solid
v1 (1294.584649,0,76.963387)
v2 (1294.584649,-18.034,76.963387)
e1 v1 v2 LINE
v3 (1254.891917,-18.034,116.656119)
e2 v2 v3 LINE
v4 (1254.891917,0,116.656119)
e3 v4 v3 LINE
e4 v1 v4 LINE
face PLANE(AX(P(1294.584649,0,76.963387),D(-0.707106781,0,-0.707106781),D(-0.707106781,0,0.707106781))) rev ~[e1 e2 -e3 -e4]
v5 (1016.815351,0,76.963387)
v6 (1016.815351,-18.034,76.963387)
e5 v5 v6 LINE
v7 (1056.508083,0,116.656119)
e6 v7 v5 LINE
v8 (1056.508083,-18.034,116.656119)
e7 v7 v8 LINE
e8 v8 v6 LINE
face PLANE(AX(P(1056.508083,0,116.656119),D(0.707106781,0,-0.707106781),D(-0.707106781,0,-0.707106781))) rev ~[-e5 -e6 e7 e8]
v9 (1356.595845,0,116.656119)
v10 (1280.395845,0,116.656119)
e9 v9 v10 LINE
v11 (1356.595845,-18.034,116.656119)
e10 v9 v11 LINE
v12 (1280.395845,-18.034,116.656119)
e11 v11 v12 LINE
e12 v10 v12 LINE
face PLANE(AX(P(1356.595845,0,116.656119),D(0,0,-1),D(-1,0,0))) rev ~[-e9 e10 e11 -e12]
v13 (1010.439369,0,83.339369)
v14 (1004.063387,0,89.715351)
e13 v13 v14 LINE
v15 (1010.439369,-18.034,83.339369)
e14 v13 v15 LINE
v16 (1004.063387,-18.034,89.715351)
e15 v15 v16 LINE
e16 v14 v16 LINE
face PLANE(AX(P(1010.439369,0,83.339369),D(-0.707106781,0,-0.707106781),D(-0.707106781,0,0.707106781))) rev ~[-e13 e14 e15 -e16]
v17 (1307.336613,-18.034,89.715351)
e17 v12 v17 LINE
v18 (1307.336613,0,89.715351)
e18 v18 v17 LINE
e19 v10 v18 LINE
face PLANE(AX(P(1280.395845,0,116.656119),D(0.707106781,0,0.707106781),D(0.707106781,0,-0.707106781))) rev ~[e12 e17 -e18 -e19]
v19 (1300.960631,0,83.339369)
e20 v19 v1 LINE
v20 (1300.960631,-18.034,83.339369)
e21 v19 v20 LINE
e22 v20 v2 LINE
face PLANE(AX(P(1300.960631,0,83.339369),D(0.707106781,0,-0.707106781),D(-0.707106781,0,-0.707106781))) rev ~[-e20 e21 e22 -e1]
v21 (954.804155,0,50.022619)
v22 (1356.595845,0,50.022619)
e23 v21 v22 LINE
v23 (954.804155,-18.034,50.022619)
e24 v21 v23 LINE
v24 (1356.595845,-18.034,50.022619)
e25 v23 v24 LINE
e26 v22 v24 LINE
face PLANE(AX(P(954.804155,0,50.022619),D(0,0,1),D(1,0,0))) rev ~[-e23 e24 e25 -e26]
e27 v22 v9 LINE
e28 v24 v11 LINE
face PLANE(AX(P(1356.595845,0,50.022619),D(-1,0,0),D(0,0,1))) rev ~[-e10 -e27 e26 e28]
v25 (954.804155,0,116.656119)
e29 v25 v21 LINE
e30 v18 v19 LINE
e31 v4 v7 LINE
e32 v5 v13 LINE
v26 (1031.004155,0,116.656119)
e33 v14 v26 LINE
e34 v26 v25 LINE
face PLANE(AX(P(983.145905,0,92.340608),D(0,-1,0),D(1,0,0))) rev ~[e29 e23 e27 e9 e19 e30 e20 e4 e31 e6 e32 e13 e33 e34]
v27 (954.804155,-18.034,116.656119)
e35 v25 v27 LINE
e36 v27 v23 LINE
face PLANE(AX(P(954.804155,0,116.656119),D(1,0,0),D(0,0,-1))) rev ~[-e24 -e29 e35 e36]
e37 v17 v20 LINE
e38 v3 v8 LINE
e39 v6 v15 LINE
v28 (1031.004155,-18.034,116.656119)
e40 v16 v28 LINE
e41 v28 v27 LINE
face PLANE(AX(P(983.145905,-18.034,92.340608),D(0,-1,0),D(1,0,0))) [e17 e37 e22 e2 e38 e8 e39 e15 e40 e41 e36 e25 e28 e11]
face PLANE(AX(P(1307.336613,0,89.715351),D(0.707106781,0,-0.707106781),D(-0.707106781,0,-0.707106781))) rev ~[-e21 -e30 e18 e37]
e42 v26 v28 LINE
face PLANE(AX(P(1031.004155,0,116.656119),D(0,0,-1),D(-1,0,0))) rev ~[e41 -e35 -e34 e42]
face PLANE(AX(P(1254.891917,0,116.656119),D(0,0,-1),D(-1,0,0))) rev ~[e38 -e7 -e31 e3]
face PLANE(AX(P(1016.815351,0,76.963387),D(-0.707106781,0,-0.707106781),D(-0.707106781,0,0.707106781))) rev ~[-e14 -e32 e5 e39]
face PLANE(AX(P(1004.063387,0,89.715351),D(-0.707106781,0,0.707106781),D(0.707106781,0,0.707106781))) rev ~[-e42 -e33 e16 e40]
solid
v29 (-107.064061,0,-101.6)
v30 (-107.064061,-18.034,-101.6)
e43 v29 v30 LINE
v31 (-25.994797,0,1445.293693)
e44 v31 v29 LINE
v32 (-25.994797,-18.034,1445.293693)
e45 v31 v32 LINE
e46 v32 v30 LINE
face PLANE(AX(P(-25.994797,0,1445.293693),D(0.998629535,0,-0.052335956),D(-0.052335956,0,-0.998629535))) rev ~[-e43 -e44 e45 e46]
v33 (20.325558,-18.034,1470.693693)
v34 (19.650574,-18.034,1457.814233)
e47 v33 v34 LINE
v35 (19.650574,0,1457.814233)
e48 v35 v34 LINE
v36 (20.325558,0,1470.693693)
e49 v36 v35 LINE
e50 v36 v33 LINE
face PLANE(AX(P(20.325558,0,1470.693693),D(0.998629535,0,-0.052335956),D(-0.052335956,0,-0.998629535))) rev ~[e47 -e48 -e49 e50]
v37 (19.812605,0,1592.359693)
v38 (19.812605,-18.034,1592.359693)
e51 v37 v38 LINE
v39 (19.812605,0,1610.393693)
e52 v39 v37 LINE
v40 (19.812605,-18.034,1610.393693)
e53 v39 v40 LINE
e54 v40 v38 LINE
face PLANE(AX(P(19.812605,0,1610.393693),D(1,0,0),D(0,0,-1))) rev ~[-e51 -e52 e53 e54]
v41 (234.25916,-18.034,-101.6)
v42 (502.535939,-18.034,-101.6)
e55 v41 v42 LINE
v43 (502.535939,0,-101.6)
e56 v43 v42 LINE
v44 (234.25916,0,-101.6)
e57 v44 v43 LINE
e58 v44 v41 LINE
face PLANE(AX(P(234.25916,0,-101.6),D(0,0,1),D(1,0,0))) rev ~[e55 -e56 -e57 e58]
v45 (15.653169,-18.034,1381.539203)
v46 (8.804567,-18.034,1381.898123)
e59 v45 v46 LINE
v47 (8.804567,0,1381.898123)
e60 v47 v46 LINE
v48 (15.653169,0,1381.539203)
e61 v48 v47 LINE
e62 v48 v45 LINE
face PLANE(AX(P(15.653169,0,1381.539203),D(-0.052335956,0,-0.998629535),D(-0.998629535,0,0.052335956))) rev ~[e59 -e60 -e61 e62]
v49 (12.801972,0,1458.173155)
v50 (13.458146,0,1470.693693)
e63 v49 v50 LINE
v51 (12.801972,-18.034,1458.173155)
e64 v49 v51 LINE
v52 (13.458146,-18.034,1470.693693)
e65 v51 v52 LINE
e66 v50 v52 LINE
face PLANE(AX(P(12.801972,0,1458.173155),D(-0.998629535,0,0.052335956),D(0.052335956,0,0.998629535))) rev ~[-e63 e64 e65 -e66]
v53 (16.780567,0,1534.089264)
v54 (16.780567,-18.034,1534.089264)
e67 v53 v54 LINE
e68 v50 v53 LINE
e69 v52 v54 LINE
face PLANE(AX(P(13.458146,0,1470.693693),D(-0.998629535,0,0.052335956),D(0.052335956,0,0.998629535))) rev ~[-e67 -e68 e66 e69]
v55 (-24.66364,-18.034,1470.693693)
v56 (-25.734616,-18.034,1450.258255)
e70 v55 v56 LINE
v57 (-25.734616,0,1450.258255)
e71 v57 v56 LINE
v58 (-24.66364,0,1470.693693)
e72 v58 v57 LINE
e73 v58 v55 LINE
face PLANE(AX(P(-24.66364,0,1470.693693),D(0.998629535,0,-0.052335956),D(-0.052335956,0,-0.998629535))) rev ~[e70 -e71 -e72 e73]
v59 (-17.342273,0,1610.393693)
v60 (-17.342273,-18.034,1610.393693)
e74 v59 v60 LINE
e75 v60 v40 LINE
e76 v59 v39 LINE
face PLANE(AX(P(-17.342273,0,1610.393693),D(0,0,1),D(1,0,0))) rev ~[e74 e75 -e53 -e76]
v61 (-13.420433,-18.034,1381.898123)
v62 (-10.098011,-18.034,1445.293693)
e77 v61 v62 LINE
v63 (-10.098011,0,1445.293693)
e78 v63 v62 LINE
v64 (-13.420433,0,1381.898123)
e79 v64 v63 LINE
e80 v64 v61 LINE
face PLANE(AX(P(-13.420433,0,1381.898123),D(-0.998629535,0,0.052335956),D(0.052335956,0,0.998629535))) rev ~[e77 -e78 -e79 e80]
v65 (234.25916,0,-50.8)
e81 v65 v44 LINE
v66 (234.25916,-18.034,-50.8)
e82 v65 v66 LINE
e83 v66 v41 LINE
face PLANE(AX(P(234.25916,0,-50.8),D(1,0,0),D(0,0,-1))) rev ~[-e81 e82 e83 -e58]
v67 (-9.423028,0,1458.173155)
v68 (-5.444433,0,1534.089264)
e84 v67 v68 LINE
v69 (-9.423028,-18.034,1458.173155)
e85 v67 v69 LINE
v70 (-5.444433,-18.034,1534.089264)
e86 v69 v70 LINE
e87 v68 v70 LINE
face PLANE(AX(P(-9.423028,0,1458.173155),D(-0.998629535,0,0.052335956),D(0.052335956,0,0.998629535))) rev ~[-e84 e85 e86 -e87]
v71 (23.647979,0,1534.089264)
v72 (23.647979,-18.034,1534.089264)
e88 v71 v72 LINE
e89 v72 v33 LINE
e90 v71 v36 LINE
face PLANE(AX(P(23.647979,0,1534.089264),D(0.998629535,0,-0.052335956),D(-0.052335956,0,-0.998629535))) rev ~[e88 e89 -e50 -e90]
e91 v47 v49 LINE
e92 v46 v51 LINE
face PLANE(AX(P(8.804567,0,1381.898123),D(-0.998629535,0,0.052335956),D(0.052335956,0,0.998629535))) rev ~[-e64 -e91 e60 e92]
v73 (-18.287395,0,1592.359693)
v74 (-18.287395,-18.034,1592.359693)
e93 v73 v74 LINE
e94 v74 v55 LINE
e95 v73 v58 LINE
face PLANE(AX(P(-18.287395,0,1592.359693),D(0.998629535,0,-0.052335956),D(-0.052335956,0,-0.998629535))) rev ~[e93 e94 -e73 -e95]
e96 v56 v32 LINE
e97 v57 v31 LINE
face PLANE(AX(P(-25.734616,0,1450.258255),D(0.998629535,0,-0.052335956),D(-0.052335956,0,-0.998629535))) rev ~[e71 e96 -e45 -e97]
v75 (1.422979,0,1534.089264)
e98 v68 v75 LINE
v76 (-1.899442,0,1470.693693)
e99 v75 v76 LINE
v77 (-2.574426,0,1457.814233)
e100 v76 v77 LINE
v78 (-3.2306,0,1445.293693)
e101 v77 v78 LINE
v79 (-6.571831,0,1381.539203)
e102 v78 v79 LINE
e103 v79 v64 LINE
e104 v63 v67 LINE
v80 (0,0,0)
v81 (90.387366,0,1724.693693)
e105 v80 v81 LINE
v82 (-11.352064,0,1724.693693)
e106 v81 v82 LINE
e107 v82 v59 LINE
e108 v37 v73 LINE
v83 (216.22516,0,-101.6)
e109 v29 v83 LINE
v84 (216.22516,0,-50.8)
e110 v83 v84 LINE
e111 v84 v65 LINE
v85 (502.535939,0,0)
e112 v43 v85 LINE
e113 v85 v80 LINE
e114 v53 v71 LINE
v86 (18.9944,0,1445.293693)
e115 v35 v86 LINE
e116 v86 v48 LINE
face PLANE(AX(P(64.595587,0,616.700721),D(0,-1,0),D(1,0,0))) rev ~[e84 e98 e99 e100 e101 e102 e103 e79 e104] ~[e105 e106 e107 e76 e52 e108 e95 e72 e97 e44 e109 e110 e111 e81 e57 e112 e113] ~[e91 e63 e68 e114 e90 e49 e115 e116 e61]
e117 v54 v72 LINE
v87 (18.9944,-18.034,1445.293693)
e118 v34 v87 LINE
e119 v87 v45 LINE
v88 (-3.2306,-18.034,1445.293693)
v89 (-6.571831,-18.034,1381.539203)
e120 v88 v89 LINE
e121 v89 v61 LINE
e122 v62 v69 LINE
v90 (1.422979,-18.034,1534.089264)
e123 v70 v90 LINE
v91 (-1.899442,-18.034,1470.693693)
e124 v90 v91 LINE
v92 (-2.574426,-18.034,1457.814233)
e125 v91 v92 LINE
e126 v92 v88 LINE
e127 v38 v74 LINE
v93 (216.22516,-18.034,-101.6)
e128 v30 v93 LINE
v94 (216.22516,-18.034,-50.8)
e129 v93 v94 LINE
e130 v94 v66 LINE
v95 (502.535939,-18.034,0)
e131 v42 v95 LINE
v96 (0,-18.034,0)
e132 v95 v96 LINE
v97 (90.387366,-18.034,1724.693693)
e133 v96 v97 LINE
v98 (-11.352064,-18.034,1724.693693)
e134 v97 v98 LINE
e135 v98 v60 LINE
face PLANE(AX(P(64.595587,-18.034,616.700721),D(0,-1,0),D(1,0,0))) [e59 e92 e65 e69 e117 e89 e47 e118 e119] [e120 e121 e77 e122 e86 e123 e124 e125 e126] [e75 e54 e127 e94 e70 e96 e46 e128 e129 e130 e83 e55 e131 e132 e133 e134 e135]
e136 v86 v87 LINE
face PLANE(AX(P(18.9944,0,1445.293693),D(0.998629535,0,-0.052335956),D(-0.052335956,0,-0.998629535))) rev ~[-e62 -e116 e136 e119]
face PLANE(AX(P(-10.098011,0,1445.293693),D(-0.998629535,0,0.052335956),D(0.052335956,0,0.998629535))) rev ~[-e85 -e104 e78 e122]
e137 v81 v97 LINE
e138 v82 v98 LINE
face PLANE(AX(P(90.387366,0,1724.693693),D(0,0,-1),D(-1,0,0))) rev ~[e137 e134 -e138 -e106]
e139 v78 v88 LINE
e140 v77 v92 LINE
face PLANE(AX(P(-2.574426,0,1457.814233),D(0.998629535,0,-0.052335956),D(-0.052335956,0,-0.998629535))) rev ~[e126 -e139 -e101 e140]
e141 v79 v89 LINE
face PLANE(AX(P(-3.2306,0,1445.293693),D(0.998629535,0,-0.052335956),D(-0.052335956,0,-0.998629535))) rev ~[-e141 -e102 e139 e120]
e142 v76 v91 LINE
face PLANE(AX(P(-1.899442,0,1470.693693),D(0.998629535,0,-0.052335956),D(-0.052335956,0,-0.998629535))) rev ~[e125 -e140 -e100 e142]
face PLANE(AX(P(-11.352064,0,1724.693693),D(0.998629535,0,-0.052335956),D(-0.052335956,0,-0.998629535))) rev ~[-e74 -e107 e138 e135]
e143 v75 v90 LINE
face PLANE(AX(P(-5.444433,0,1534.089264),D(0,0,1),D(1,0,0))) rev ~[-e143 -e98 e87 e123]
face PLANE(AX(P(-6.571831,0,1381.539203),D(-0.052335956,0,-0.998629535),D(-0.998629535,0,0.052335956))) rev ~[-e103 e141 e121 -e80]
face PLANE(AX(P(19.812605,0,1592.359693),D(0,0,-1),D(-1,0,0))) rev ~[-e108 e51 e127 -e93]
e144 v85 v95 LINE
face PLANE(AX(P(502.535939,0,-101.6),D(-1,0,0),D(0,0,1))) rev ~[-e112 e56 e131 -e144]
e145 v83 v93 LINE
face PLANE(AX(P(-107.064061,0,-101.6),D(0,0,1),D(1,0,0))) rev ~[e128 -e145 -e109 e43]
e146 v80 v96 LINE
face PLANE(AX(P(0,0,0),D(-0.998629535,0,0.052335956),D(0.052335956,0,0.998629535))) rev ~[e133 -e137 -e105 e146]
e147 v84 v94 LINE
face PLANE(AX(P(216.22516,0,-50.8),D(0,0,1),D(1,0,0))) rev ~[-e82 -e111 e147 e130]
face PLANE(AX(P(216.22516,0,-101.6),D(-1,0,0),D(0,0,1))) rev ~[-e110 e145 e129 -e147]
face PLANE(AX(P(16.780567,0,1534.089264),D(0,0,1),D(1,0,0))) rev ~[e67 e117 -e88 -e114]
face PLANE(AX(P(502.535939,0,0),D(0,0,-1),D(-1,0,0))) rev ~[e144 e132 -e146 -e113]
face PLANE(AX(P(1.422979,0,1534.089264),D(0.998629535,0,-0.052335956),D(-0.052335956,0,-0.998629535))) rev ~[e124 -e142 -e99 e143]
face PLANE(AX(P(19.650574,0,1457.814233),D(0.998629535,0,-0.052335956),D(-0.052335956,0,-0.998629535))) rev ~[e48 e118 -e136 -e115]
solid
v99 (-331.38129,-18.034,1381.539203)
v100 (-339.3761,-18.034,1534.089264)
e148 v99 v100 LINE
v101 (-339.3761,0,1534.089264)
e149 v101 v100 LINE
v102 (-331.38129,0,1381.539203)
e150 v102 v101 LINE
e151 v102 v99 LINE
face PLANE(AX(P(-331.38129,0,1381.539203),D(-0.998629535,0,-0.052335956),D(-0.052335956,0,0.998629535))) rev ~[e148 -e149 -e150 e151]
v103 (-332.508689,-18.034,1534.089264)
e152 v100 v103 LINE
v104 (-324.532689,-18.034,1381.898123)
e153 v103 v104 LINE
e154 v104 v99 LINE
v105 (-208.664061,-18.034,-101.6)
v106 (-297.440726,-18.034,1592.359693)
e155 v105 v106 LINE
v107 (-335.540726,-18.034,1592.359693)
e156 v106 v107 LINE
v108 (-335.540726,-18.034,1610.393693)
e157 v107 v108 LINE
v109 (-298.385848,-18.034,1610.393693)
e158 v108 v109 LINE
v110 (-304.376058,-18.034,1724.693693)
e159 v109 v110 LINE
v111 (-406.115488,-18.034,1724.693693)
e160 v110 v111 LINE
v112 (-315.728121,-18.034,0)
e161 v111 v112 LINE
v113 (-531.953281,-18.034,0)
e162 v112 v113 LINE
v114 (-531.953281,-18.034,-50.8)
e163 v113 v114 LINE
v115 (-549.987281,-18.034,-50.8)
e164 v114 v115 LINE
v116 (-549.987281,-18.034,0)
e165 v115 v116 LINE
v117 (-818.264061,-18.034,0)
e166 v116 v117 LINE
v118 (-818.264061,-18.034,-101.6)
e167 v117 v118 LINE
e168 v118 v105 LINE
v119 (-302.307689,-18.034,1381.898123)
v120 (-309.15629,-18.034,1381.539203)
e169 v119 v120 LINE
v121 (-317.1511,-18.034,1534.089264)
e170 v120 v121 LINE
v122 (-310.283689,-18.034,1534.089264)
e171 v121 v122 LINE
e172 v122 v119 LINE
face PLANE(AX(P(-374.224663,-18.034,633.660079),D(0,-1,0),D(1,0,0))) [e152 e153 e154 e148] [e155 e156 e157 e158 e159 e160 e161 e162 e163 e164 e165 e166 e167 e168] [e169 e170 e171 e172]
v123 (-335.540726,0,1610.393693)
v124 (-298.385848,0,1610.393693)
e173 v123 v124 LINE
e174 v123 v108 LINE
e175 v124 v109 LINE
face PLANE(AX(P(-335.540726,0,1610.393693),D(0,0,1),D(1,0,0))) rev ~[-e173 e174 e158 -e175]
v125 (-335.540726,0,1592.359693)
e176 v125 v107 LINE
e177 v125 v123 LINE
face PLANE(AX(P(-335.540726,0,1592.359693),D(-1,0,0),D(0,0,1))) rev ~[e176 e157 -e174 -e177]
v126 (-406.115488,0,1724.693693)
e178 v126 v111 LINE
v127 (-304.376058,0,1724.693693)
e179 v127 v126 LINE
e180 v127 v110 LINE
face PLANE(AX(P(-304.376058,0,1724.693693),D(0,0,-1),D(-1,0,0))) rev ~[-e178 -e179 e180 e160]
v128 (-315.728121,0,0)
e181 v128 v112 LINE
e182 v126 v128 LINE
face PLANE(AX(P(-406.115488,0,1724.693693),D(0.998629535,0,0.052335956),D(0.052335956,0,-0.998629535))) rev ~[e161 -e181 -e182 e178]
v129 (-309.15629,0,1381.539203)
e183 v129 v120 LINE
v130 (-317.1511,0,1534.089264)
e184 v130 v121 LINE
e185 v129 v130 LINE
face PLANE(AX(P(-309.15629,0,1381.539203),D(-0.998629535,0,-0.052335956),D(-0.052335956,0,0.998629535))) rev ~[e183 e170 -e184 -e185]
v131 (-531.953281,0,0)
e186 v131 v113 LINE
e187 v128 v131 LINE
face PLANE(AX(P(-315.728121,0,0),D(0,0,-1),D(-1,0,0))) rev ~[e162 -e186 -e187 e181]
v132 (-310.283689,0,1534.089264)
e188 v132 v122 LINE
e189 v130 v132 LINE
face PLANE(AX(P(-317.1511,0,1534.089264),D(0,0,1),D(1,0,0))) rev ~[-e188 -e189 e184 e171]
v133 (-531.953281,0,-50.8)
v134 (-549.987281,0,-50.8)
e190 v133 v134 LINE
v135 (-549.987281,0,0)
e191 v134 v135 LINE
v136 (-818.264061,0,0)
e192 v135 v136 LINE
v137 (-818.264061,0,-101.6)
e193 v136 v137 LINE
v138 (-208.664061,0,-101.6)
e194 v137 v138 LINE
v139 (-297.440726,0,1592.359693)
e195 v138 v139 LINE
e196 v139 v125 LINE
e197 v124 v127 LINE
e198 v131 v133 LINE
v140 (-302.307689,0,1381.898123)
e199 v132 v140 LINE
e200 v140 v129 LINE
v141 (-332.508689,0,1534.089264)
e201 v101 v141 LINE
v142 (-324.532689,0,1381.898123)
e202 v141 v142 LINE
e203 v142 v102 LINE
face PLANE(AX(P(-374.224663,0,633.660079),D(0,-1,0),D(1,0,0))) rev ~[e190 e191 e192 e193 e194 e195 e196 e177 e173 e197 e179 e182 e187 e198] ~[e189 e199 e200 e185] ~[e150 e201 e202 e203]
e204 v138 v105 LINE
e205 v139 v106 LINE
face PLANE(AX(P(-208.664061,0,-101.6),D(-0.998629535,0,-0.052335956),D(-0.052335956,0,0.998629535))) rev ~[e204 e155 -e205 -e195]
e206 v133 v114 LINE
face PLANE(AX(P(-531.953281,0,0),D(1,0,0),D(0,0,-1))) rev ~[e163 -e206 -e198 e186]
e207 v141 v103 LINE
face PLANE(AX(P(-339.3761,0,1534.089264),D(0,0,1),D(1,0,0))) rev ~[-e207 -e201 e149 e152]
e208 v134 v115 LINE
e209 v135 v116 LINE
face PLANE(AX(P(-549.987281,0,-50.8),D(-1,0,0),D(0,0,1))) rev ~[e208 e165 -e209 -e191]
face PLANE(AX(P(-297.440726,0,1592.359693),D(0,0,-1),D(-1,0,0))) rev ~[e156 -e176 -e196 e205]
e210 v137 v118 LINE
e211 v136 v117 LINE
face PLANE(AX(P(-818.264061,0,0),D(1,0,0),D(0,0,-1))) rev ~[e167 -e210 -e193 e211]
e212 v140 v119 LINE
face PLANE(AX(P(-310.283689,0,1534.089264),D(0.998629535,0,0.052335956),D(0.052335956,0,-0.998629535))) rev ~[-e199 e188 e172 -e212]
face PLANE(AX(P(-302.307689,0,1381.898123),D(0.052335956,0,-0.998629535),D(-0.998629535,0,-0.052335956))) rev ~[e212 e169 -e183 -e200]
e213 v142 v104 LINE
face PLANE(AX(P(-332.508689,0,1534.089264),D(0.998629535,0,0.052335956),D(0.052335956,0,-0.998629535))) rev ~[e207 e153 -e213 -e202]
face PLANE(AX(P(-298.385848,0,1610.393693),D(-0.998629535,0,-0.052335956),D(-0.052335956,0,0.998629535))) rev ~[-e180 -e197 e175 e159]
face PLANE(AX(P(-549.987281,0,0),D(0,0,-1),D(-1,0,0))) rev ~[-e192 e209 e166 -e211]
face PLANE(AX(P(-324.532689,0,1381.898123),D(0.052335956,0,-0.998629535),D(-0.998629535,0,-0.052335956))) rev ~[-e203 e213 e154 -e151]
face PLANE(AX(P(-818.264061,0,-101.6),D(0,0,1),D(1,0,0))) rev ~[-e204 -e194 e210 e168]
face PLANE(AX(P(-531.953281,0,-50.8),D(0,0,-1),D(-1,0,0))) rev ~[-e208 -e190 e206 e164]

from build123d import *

# Parameters (mm, degrees)
F1_DEPTH = 18.034


# Not quite as in the source:
# - a feature names something its author has since deleted; it is built from what else it names


with BuildPart() as f1:
    # F0 (on Front) → F1 (new body)
    with BuildSketch(Plane.XZ):
        Polygon((502.5359392715, 0), (0, 0), (90.3873664019, 1724.6936931592), (39.5176512252, 1724.6936931592), (39.5176512252, 1267.4936931592), (-19.4161146469, 1267.4936931592), (-35.3129006397, 1267.4936931592), (-107.0640607285, -101.6), (216.2251596299, -101.6), (216.2251596299, -50.8), (234.2591596299, -50.8), (234.2591596299, -101.6), (502.5359392715, -101.6), align=None)
        Polygon((39.5176512252, 1267.4936931592), (39.5176512252, 1724.6936931592), (-11.3520639514, 1724.6936931592), (-17.3422731235, 1610.3936931592), (19.8126049849, 1610.3936931592), (19.8126049849, 1592.3596931592), (-18.2873950151, 1592.3596931592), (-24.6636398893, 1470.6936931592), (-8.7668538966, 1470.6936931592), (-5.4444328278, 1534.0892637075), (1.422978721, 1534.0892637075), (-1.8994423478, 1470.6936931592), (13.4581461034, 1470.6936931592), (16.7805671722, 1534.0892637075), (23.647978721, 1534.0892637075), (20.3255576522, 1470.6936931592), (28.9262730809, 1470.6936931592), (28.9262730809, 1445.2936931592), (18.9944000584, 1445.2936931592), (15.6531687901, 1381.539202623), (8.8045674408, 1381.8981226109), (12.1269885096, 1445.2936931592), (-3.2305999416, 1445.2936931592), (-6.5718312099, 1381.539202623), (-13.4204325592, 1381.8981226109), (-19.4161146469, 1267.4936931592), align=None)
        Polygon((-35.3129006397, 1267.4936931592), (-19.4161146469, 1267.4936931592), (-13.4204325592, 1381.8981226109), (-10.0980114904, 1445.2936931592), (-25.9947974831, 1445.2936931592), align=None)
        Polygon((-8.7668538966, 1470.6936931592), (-24.6636398893, 1470.6936931592), (-25.7346158366, 1450.2582547212), (-10.0980114904, 1445.2936931592), (-9.4230275025, 1458.1731548939), align=None)
        Polygon((-25.7346158366, 1450.2582547212), (-25.9947974831, 1445.2936931592), (-10.0980114904, 1445.2936931592), align=None)
        Polygon((-2.5744262358, 1457.8142333288), (-3.2305999416, 1445.2936931592), (12.1269885096, 1445.2936931592), (12.8019724807, 1458.173154574), (13.4581461034, 1470.6936931592), (-1.8994423478, 1470.6936931592), align=None)
        Polygon((19.6505737569, 1457.8142331896), (18.9944000584, 1445.2936931592), (28.9262730809, 1445.2936931592), (28.9262730809, 1470.6936931592), (20.3255576522, 1470.6936931592), align=None)
    extrude(amount=F1_DEPTH)


with BuildPart() as f1b:
    # F0 (on Front) → F1, piece 2 (new body)
    with BuildSketch(Plane.XZ):
        Polygon((954.8041553716, 50.0226186452), (964.3706549533, 50.0226186452), (977.1226186452, 62.7745823371), (1004.0633870084, 89.7153507003), (1031.0041553716, 116.6561190635), (954.8041553716, 116.6561190635), align=None)
        Polygon((977.1226186452, 62.7745823371), (964.3706549533, 50.0226186452), (989.8745823371, 50.0226186452), (983.4986004912, 56.3986004912), align=None)
        Polygon((983.4986004912, 56.3986004912), (989.8745823371, 50.0226186452), (1016.8153507003, 76.9633870084), (1010.4393688544, 83.3393688544), (1004.0633870084, 89.7153507003), (977.1226186452, 62.7745823371), align=None)
        Polygon((1016.8153507003, 76.9633870084), (989.8745823371, 50.0226186452), (1155.7, 50.0226186452), (1321.5254176629, 50.0226186452), (1294.5846492997, 76.9633870084), (1254.8919172446, 116.6561190635), (1155.7, 116.6561190635), (1056.5080827554, 116.6561190635), align=None)
        Polygon((1294.5846492997, 76.9633870084), (1321.5254176629, 50.0226186452), (1347.0293450467, 50.0226186452), (1307.3366129916, 89.7153507003), (1300.9606311456, 83.3393688544), align=None)
        Polygon((1307.3366129916, 89.7153507003), (1347.0293450467, 50.0226186452), (1356.5958446284, 50.0226186452), (1356.5958446284, 116.6561190635), (1280.3958446284, 116.6561190635), align=None)
    extrude(amount=F1_DEPTH)


with BuildPart() as f1c:
    # F0 (on Front) → F1, piece 3 (new body)
    with BuildSketch(Plane.XZ):
        Polygon((-531.953281087, 0), (-531.953281087, -50.8), (-549.987281087, -50.8), (-549.987281087, 0), (-818.2640607285, 0), (-818.2640607285, -101.6), (-208.6640607285, -101.6), (-297.440726442, 1592.3596931592), (-335.540726442, 1592.3596931592), (-335.540726442, 1610.3936931592), (-298.3858483336, 1610.3936931592), (-304.3760575056, 1724.6936931592), (-406.115487859, 1724.6936931592), (-315.7281214571, 0), align=None)
        Polygon((-324.5326888979, 1381.8981226109), (-331.3812902472, 1381.539202623), (-339.3761001781, 1534.0892637075), (-332.5086886293, 1534.0892637075), align=None, mode=Mode.SUBTRACT)
        Polygon((-317.1511001781, 1534.0892637075), (-310.2836886293, 1534.0892637075), (-302.3076888979, 1381.8981226109), (-309.1562902472, 1381.539202623), align=None, mode=Mode.SUBTRACT)
    extrude(amount=F1_DEPTH)


solid = Compound([f1.part, f1b.part, f1c.part])
